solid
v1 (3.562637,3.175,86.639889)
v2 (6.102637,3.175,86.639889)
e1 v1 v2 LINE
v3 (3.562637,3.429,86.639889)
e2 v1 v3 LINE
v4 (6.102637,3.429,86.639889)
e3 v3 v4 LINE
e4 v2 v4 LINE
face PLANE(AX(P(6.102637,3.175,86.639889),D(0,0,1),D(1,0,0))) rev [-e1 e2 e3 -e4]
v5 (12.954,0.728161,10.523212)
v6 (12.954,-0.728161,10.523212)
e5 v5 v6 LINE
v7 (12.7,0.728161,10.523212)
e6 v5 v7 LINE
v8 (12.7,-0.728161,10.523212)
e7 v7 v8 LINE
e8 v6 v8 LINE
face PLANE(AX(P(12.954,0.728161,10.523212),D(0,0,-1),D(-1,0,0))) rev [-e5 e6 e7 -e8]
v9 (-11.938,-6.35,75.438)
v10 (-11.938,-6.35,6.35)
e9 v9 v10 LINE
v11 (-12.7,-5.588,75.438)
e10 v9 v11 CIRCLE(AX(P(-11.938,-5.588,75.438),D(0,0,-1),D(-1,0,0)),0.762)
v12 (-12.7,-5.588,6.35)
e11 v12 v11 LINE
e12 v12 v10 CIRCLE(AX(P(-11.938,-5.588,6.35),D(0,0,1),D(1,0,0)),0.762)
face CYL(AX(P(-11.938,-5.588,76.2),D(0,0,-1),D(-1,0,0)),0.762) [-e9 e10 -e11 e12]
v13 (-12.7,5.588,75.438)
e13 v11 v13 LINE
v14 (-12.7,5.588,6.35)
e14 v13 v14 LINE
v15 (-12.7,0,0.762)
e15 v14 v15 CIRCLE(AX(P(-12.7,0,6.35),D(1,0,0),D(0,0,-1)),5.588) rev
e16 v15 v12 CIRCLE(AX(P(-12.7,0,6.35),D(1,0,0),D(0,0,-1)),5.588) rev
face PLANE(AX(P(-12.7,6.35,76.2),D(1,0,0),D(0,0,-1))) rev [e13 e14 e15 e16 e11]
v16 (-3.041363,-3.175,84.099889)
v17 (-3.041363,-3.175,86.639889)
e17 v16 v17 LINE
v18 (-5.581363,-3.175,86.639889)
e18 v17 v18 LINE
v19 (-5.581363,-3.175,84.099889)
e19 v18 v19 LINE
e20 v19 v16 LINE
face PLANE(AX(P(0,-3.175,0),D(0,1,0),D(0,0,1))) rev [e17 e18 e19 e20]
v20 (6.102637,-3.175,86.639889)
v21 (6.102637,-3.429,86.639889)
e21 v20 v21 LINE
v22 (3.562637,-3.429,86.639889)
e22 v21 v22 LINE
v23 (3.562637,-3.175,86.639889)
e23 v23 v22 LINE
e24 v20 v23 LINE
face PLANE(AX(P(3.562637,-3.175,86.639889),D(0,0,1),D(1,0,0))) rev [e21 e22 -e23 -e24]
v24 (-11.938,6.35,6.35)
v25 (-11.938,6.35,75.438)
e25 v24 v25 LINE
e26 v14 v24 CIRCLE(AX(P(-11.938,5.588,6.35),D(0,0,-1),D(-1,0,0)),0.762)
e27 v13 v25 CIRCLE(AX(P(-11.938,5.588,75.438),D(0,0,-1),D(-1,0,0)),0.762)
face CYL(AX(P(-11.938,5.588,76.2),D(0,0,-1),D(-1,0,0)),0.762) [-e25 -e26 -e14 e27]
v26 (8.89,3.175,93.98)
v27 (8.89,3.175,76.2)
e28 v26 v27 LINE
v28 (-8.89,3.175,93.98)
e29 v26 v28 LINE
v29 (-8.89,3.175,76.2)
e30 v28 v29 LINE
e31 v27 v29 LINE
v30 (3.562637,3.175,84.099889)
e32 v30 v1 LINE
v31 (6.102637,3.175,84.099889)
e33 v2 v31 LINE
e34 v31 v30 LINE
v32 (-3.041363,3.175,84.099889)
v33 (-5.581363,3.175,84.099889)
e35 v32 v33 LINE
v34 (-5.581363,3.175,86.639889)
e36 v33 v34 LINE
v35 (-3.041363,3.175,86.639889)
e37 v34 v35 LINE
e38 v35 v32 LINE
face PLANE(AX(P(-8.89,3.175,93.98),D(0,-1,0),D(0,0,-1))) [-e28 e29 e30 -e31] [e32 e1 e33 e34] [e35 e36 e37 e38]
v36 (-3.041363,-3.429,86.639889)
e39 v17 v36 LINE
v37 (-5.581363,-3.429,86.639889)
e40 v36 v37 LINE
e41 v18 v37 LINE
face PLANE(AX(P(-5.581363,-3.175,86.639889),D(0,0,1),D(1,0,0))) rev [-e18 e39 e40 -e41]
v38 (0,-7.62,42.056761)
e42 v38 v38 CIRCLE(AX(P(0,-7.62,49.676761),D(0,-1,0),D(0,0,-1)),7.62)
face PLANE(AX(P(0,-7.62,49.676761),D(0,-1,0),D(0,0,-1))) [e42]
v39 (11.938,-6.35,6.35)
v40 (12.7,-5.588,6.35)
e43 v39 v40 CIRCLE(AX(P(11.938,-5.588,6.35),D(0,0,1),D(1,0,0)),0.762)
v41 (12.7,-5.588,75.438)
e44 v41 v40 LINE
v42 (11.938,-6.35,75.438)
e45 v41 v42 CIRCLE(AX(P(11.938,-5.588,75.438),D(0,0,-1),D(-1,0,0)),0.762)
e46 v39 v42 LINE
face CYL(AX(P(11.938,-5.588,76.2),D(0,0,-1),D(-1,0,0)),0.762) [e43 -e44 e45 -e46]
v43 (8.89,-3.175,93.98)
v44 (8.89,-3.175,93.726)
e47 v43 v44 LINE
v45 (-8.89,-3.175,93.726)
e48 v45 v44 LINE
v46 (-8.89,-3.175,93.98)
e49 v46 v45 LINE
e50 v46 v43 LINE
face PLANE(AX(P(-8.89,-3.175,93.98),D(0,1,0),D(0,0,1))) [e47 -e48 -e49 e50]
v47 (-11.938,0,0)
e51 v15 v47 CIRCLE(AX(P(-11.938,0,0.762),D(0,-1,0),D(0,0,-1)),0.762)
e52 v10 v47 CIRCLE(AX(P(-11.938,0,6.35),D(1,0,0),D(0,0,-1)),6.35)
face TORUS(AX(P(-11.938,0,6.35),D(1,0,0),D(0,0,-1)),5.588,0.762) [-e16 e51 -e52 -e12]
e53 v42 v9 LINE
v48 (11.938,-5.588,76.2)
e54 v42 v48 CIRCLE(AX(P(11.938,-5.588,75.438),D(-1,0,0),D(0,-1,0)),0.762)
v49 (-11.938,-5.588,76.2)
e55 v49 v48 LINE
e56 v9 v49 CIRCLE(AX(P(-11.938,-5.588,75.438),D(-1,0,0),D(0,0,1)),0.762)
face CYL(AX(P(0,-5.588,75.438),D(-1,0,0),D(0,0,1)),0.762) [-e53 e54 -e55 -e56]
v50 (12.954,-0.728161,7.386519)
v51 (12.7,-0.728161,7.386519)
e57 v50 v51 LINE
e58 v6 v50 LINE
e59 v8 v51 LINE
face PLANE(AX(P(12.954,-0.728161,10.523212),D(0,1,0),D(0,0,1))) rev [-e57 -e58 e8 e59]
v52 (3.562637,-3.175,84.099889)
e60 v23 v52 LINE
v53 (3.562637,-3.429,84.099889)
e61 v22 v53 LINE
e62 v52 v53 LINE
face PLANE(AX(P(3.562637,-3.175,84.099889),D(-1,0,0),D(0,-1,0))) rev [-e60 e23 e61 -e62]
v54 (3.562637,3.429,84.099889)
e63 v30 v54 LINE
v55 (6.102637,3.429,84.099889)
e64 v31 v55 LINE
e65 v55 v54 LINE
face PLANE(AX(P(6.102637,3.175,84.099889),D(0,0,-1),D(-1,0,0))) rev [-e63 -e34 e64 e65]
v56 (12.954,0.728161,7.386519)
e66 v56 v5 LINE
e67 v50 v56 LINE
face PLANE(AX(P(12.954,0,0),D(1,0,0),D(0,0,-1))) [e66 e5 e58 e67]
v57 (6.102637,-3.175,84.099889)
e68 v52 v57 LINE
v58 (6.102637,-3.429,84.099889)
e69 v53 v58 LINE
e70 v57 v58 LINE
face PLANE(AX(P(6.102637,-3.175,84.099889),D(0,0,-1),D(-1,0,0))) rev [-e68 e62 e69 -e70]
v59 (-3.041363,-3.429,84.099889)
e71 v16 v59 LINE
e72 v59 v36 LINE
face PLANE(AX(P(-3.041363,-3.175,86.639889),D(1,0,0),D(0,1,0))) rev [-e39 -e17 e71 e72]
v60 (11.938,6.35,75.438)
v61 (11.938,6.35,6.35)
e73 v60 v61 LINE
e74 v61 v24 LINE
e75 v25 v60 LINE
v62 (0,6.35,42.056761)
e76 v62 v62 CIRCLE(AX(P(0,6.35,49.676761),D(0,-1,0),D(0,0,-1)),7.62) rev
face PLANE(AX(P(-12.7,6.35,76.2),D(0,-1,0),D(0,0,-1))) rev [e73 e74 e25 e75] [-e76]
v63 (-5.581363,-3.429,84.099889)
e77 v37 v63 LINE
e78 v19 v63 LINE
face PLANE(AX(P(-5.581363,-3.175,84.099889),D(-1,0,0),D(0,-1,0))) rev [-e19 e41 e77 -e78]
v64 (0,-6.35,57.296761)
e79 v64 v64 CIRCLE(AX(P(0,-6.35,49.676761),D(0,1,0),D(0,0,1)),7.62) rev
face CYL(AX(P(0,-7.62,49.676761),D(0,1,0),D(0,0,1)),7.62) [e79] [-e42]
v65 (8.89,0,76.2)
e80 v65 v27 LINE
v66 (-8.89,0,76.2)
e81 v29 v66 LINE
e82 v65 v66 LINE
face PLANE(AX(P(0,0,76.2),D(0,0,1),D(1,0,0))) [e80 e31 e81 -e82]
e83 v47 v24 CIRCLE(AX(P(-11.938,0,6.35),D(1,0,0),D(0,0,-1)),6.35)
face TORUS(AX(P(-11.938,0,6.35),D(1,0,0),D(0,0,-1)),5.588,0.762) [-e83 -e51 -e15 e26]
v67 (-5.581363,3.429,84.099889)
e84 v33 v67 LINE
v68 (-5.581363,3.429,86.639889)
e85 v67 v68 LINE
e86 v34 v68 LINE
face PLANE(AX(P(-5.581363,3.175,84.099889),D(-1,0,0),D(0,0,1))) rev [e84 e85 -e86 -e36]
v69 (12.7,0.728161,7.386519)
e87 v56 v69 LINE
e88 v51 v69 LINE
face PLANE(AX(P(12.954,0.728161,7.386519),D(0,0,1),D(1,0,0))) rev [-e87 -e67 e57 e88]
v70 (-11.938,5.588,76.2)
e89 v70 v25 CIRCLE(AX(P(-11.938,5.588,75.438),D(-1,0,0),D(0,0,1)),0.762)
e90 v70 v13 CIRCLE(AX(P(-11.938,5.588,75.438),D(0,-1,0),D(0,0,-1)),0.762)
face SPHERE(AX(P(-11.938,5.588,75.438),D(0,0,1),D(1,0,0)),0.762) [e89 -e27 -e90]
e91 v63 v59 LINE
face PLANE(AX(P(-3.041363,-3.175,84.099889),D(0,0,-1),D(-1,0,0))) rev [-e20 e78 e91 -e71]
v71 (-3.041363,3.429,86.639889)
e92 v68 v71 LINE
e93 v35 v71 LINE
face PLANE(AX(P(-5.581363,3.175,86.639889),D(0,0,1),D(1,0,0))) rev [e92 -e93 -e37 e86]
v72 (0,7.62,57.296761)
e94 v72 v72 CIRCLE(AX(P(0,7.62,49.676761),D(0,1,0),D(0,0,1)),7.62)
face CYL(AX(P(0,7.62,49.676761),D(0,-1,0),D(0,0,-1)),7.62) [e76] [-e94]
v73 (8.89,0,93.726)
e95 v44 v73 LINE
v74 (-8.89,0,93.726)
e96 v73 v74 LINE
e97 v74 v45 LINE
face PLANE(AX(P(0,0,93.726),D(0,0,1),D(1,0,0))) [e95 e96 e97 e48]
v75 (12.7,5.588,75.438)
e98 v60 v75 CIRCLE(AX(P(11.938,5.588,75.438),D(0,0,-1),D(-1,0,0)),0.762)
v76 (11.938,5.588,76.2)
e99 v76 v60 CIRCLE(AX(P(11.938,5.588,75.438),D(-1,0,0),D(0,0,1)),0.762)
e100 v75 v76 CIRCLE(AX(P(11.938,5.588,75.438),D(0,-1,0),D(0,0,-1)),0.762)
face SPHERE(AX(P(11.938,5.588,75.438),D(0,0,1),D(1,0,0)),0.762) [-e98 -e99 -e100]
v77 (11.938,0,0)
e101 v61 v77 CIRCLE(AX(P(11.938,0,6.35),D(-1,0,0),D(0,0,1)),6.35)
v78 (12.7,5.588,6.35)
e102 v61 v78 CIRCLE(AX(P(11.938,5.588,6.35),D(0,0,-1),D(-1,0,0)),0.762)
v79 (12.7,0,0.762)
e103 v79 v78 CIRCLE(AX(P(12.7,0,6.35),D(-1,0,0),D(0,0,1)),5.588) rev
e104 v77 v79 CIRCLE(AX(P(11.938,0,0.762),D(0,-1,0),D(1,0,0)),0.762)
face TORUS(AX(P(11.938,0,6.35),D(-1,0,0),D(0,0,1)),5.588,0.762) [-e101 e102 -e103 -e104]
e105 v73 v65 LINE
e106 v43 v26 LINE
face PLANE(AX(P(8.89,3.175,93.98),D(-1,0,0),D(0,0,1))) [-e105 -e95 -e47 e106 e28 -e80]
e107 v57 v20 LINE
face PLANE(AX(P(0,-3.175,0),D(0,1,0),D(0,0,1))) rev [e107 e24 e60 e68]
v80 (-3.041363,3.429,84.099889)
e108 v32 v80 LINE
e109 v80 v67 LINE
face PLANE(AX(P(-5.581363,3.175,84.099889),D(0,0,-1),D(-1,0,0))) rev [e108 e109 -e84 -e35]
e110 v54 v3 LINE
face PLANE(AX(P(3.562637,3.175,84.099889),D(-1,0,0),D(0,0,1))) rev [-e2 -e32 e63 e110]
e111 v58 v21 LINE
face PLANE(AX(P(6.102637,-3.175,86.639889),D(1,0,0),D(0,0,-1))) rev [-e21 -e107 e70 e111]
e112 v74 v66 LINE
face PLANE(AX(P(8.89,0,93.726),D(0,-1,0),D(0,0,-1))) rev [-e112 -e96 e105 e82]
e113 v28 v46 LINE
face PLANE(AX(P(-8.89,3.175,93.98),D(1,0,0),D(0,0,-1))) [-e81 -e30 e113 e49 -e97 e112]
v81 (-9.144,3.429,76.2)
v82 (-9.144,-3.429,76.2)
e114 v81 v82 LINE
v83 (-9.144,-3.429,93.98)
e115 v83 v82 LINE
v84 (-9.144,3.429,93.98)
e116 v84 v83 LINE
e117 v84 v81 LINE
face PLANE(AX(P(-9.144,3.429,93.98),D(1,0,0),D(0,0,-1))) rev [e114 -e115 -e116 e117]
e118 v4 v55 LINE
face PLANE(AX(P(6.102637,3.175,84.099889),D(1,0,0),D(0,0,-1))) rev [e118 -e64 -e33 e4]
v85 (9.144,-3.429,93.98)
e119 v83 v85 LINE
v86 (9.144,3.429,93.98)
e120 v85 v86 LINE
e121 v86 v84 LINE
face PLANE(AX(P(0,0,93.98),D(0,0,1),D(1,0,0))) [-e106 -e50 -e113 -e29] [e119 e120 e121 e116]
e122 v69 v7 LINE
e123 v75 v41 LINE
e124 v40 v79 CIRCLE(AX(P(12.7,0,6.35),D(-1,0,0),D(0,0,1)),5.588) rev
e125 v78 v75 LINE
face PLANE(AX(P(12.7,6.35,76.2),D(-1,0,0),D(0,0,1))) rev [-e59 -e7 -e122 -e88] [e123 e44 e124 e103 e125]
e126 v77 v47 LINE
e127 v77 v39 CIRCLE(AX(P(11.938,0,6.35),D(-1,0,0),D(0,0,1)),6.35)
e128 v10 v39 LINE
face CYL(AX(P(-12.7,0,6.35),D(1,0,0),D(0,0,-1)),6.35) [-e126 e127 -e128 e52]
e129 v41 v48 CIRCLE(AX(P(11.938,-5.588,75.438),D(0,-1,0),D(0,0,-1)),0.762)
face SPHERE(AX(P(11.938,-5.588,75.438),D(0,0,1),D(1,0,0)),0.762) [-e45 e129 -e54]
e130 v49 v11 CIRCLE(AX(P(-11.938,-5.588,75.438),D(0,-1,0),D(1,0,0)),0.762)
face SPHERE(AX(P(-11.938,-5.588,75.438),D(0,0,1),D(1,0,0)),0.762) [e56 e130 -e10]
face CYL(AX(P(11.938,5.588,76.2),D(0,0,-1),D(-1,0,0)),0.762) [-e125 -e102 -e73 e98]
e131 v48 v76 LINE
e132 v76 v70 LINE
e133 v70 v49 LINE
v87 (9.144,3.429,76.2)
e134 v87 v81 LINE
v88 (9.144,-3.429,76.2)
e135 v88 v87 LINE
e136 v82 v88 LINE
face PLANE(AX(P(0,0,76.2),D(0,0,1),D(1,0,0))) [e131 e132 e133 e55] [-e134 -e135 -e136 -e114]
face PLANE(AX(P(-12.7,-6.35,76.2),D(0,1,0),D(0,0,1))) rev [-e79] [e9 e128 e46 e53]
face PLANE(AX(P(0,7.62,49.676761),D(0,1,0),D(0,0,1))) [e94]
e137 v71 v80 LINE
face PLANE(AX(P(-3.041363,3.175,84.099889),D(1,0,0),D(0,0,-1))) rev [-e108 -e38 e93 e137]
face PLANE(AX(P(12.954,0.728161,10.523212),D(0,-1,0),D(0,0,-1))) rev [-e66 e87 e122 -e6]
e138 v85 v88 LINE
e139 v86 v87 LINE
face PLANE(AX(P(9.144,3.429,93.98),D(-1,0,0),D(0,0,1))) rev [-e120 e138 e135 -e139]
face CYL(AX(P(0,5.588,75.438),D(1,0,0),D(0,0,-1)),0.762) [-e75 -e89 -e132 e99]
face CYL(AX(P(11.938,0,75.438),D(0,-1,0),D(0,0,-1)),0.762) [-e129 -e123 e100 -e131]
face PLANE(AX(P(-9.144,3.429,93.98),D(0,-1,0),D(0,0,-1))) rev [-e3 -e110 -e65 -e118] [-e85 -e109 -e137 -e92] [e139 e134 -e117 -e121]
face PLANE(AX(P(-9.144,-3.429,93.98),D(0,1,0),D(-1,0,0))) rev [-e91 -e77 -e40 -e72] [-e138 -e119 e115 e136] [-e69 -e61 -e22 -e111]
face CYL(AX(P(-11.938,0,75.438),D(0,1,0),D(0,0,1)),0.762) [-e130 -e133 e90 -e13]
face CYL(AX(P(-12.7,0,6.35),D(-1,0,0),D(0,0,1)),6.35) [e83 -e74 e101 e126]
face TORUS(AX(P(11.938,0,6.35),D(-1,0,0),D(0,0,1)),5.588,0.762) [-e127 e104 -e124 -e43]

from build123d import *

# Parameters (mm, degrees)
SKETCH1_W           = 25.4
SKETCH1_H           = 12.7
BOSS_EXTRUDE1_DEPTH = 76.2
FILLET1_R           = 6.35
SKETCH3_W           = 18.288
SKETCH3_H           = 6.858
SKETCH3_W_2         = 17.78
SKETCH3_H_2         = 6.35
BOSS_EXTRUDE2_DEPTH = 17.78
SKETCH4_W           = 17.78
SKETCH4_H           = 3.175
BOSS_EXTRUDE3_DEPTH = 17.526
SKETCH5_W           = 2.54
SKETCH5_H           = 2.54
CUT_EXTRUDE1_DEPTH  = 0.254
SKETCH7_W           = 2.54
SKETCH7_H           = 2.54
CUT_EXTRUDE6_DEPTH  = 0.254
FILLET2_R           = 0.762
FILLET3_R           = 0.762
SKETCH20_R          = 7.62
BOSS_EXTRUDE4_DEPTH = 1.27
BOSS_EXTRUDE5_START = 1.27
SKETCH21_R          = 7.62
BOSS_EXTRUDE5_DEPTH = 1.27
SKETCH23_W          = 3.136693438
SKETCH23_H          = 1.456321954
BOSS_EXTRUDE6_DEPTH = 0.254


with BuildPart() as part:
    # Sketch1 → Boss-Extrude1 (new body)
    with BuildSketch(Plane.XY):
        Rectangle(SKETCH1_W, SKETCH1_H)
    extrude(amount=BOSS_EXTRUDE1_DEPTH)

    # Fillet1
    fillet1_edges = [part.edges().sort_by_distance(p)[0] for p in [
        (0, 6.35, 0),
        (0, -6.35, 0),
    ]]
    fillet(fillet1_edges, radius=FILLET1_R - 0.0001)  # a hair under: the kernel refuses the full size

    # Sketch3 → Boss-Extrude2 (add)
    with BuildSketch(Plane.XY.offset(76.2)):
        Rectangle(SKETCH3_W, SKETCH3_H)
        Rectangle(SKETCH3_W_2, SKETCH3_H_2, mode=Mode.SUBTRACT)
    extrude(amount=BOSS_EXTRUDE2_DEPTH)

    # Sketch4 → Boss-Extrude3 (add)
    with BuildSketch(Plane.XY.offset(76.2)):
        with Locations((0, -1.5875)):
            Rectangle(SKETCH4_W, SKETCH4_H)
    extrude(amount=BOSS_EXTRUDE3_DEPTH)

    # Sketch5 → Cut-Extrude1 (cut)
    with BuildSketch(Plane(origin=(0, 3.429, 0), x_dir=(1, 0, 0), z_dir=(0, 1, 0))):
        with Locations((4.832637326, -85.369889154)):
            Rectangle(SKETCH5_W, SKETCH5_H)
        with Locations((-4.311362674, -85.369889154)):
            Rectangle(SKETCH5_W, SKETCH5_H)
    extrude(amount=-CUT_EXTRUDE1_DEPTH, mode=Mode.SUBTRACT)

    # Sketch7 → Cut-Extrude6 (cut)
    with BuildSketch(Plane.XZ.offset(3.429)):
        with Locations((4.832637326, 85.369889154)):
            Rectangle(SKETCH7_W, SKETCH7_H)
        with Locations((-4.311362674, 85.369889154)):
            Rectangle(SKETCH7_W, SKETCH7_H)
    extrude(amount=-CUT_EXTRUDE6_DEPTH, mode=Mode.SUBTRACT)

    # Fillet2
    fillet2_edges = [part.edges().sort_by_distance(p)[0] for p in [
        (-12.7, -4.49015735, 1.85984265),
        (-12.7, 4.49015735, 1.85984265),
        (12.7, -4.49015735, 1.85984265),
        (12.7, 4.49015735, 1.85984265),
        (12.7, -6.35, 41.27495),
        (-12.7, -6.35, 41.27495),
        (-12.7, 6.35, 41.27495),
        (12.7, 6.35, 41.27495),
    ]]
    fillet(fillet2_edges, radius=FILLET2_R)

    # Fillet3
    fillet3_edges = [part.edges().sort_by_distance(p)[0] for p in [
        (0, -6.35, 76.2),
        (-12.7, 0, 76.2),
        (12.7, 0, 76.2),
        (0, 6.35, 76.2),
        (12.476815367, 6.126815367, 76.2),
        (-12.476815367, 6.126815367, 76.2),
        (12.476815367, -6.126815367, 76.2),
        (-12.476815367, -6.126815367, 76.2),
    ]]
    fillet(fillet3_edges, radius=FILLET3_R)

    # Sketch20 → Boss-Extrude4 (add)
    with BuildSketch(Plane(origin=(0, 6.35, 0), x_dir=(1, 0, 0), z_dir=(0, 1, 0))):
        with Locations(Location((0, -49.676760647, 0), (0, 0, 90))):
            Circle(SKETCH20_R)
    extrude(amount=BOSS_EXTRUDE4_DEPTH)

    # Sketch21 → Boss-Extrude5 (add)
    with BuildSketch(Plane.XZ.offset(6.35).offset(BOSS_EXTRUDE5_START)):
        with Locations(Location((0, 49.676760647, 0), (0, 0, 270))):
            Circle(SKETCH21_R)
    extrude(amount=-BOSS_EXTRUDE5_DEPTH)

    # Sketch23 → Boss-Extrude6 (add)
    with BuildSketch(Plane(origin=(12.7, 0, 0), x_dir=(0, 0, -1), z_dir=(1, 0, 0))):
        with Locations((-8.954865749, 0)):
            Rectangle(SKETCH23_W, SKETCH23_H)
    extrude(amount=BOSS_EXTRUDE6_DEPTH)


solid = part.part
